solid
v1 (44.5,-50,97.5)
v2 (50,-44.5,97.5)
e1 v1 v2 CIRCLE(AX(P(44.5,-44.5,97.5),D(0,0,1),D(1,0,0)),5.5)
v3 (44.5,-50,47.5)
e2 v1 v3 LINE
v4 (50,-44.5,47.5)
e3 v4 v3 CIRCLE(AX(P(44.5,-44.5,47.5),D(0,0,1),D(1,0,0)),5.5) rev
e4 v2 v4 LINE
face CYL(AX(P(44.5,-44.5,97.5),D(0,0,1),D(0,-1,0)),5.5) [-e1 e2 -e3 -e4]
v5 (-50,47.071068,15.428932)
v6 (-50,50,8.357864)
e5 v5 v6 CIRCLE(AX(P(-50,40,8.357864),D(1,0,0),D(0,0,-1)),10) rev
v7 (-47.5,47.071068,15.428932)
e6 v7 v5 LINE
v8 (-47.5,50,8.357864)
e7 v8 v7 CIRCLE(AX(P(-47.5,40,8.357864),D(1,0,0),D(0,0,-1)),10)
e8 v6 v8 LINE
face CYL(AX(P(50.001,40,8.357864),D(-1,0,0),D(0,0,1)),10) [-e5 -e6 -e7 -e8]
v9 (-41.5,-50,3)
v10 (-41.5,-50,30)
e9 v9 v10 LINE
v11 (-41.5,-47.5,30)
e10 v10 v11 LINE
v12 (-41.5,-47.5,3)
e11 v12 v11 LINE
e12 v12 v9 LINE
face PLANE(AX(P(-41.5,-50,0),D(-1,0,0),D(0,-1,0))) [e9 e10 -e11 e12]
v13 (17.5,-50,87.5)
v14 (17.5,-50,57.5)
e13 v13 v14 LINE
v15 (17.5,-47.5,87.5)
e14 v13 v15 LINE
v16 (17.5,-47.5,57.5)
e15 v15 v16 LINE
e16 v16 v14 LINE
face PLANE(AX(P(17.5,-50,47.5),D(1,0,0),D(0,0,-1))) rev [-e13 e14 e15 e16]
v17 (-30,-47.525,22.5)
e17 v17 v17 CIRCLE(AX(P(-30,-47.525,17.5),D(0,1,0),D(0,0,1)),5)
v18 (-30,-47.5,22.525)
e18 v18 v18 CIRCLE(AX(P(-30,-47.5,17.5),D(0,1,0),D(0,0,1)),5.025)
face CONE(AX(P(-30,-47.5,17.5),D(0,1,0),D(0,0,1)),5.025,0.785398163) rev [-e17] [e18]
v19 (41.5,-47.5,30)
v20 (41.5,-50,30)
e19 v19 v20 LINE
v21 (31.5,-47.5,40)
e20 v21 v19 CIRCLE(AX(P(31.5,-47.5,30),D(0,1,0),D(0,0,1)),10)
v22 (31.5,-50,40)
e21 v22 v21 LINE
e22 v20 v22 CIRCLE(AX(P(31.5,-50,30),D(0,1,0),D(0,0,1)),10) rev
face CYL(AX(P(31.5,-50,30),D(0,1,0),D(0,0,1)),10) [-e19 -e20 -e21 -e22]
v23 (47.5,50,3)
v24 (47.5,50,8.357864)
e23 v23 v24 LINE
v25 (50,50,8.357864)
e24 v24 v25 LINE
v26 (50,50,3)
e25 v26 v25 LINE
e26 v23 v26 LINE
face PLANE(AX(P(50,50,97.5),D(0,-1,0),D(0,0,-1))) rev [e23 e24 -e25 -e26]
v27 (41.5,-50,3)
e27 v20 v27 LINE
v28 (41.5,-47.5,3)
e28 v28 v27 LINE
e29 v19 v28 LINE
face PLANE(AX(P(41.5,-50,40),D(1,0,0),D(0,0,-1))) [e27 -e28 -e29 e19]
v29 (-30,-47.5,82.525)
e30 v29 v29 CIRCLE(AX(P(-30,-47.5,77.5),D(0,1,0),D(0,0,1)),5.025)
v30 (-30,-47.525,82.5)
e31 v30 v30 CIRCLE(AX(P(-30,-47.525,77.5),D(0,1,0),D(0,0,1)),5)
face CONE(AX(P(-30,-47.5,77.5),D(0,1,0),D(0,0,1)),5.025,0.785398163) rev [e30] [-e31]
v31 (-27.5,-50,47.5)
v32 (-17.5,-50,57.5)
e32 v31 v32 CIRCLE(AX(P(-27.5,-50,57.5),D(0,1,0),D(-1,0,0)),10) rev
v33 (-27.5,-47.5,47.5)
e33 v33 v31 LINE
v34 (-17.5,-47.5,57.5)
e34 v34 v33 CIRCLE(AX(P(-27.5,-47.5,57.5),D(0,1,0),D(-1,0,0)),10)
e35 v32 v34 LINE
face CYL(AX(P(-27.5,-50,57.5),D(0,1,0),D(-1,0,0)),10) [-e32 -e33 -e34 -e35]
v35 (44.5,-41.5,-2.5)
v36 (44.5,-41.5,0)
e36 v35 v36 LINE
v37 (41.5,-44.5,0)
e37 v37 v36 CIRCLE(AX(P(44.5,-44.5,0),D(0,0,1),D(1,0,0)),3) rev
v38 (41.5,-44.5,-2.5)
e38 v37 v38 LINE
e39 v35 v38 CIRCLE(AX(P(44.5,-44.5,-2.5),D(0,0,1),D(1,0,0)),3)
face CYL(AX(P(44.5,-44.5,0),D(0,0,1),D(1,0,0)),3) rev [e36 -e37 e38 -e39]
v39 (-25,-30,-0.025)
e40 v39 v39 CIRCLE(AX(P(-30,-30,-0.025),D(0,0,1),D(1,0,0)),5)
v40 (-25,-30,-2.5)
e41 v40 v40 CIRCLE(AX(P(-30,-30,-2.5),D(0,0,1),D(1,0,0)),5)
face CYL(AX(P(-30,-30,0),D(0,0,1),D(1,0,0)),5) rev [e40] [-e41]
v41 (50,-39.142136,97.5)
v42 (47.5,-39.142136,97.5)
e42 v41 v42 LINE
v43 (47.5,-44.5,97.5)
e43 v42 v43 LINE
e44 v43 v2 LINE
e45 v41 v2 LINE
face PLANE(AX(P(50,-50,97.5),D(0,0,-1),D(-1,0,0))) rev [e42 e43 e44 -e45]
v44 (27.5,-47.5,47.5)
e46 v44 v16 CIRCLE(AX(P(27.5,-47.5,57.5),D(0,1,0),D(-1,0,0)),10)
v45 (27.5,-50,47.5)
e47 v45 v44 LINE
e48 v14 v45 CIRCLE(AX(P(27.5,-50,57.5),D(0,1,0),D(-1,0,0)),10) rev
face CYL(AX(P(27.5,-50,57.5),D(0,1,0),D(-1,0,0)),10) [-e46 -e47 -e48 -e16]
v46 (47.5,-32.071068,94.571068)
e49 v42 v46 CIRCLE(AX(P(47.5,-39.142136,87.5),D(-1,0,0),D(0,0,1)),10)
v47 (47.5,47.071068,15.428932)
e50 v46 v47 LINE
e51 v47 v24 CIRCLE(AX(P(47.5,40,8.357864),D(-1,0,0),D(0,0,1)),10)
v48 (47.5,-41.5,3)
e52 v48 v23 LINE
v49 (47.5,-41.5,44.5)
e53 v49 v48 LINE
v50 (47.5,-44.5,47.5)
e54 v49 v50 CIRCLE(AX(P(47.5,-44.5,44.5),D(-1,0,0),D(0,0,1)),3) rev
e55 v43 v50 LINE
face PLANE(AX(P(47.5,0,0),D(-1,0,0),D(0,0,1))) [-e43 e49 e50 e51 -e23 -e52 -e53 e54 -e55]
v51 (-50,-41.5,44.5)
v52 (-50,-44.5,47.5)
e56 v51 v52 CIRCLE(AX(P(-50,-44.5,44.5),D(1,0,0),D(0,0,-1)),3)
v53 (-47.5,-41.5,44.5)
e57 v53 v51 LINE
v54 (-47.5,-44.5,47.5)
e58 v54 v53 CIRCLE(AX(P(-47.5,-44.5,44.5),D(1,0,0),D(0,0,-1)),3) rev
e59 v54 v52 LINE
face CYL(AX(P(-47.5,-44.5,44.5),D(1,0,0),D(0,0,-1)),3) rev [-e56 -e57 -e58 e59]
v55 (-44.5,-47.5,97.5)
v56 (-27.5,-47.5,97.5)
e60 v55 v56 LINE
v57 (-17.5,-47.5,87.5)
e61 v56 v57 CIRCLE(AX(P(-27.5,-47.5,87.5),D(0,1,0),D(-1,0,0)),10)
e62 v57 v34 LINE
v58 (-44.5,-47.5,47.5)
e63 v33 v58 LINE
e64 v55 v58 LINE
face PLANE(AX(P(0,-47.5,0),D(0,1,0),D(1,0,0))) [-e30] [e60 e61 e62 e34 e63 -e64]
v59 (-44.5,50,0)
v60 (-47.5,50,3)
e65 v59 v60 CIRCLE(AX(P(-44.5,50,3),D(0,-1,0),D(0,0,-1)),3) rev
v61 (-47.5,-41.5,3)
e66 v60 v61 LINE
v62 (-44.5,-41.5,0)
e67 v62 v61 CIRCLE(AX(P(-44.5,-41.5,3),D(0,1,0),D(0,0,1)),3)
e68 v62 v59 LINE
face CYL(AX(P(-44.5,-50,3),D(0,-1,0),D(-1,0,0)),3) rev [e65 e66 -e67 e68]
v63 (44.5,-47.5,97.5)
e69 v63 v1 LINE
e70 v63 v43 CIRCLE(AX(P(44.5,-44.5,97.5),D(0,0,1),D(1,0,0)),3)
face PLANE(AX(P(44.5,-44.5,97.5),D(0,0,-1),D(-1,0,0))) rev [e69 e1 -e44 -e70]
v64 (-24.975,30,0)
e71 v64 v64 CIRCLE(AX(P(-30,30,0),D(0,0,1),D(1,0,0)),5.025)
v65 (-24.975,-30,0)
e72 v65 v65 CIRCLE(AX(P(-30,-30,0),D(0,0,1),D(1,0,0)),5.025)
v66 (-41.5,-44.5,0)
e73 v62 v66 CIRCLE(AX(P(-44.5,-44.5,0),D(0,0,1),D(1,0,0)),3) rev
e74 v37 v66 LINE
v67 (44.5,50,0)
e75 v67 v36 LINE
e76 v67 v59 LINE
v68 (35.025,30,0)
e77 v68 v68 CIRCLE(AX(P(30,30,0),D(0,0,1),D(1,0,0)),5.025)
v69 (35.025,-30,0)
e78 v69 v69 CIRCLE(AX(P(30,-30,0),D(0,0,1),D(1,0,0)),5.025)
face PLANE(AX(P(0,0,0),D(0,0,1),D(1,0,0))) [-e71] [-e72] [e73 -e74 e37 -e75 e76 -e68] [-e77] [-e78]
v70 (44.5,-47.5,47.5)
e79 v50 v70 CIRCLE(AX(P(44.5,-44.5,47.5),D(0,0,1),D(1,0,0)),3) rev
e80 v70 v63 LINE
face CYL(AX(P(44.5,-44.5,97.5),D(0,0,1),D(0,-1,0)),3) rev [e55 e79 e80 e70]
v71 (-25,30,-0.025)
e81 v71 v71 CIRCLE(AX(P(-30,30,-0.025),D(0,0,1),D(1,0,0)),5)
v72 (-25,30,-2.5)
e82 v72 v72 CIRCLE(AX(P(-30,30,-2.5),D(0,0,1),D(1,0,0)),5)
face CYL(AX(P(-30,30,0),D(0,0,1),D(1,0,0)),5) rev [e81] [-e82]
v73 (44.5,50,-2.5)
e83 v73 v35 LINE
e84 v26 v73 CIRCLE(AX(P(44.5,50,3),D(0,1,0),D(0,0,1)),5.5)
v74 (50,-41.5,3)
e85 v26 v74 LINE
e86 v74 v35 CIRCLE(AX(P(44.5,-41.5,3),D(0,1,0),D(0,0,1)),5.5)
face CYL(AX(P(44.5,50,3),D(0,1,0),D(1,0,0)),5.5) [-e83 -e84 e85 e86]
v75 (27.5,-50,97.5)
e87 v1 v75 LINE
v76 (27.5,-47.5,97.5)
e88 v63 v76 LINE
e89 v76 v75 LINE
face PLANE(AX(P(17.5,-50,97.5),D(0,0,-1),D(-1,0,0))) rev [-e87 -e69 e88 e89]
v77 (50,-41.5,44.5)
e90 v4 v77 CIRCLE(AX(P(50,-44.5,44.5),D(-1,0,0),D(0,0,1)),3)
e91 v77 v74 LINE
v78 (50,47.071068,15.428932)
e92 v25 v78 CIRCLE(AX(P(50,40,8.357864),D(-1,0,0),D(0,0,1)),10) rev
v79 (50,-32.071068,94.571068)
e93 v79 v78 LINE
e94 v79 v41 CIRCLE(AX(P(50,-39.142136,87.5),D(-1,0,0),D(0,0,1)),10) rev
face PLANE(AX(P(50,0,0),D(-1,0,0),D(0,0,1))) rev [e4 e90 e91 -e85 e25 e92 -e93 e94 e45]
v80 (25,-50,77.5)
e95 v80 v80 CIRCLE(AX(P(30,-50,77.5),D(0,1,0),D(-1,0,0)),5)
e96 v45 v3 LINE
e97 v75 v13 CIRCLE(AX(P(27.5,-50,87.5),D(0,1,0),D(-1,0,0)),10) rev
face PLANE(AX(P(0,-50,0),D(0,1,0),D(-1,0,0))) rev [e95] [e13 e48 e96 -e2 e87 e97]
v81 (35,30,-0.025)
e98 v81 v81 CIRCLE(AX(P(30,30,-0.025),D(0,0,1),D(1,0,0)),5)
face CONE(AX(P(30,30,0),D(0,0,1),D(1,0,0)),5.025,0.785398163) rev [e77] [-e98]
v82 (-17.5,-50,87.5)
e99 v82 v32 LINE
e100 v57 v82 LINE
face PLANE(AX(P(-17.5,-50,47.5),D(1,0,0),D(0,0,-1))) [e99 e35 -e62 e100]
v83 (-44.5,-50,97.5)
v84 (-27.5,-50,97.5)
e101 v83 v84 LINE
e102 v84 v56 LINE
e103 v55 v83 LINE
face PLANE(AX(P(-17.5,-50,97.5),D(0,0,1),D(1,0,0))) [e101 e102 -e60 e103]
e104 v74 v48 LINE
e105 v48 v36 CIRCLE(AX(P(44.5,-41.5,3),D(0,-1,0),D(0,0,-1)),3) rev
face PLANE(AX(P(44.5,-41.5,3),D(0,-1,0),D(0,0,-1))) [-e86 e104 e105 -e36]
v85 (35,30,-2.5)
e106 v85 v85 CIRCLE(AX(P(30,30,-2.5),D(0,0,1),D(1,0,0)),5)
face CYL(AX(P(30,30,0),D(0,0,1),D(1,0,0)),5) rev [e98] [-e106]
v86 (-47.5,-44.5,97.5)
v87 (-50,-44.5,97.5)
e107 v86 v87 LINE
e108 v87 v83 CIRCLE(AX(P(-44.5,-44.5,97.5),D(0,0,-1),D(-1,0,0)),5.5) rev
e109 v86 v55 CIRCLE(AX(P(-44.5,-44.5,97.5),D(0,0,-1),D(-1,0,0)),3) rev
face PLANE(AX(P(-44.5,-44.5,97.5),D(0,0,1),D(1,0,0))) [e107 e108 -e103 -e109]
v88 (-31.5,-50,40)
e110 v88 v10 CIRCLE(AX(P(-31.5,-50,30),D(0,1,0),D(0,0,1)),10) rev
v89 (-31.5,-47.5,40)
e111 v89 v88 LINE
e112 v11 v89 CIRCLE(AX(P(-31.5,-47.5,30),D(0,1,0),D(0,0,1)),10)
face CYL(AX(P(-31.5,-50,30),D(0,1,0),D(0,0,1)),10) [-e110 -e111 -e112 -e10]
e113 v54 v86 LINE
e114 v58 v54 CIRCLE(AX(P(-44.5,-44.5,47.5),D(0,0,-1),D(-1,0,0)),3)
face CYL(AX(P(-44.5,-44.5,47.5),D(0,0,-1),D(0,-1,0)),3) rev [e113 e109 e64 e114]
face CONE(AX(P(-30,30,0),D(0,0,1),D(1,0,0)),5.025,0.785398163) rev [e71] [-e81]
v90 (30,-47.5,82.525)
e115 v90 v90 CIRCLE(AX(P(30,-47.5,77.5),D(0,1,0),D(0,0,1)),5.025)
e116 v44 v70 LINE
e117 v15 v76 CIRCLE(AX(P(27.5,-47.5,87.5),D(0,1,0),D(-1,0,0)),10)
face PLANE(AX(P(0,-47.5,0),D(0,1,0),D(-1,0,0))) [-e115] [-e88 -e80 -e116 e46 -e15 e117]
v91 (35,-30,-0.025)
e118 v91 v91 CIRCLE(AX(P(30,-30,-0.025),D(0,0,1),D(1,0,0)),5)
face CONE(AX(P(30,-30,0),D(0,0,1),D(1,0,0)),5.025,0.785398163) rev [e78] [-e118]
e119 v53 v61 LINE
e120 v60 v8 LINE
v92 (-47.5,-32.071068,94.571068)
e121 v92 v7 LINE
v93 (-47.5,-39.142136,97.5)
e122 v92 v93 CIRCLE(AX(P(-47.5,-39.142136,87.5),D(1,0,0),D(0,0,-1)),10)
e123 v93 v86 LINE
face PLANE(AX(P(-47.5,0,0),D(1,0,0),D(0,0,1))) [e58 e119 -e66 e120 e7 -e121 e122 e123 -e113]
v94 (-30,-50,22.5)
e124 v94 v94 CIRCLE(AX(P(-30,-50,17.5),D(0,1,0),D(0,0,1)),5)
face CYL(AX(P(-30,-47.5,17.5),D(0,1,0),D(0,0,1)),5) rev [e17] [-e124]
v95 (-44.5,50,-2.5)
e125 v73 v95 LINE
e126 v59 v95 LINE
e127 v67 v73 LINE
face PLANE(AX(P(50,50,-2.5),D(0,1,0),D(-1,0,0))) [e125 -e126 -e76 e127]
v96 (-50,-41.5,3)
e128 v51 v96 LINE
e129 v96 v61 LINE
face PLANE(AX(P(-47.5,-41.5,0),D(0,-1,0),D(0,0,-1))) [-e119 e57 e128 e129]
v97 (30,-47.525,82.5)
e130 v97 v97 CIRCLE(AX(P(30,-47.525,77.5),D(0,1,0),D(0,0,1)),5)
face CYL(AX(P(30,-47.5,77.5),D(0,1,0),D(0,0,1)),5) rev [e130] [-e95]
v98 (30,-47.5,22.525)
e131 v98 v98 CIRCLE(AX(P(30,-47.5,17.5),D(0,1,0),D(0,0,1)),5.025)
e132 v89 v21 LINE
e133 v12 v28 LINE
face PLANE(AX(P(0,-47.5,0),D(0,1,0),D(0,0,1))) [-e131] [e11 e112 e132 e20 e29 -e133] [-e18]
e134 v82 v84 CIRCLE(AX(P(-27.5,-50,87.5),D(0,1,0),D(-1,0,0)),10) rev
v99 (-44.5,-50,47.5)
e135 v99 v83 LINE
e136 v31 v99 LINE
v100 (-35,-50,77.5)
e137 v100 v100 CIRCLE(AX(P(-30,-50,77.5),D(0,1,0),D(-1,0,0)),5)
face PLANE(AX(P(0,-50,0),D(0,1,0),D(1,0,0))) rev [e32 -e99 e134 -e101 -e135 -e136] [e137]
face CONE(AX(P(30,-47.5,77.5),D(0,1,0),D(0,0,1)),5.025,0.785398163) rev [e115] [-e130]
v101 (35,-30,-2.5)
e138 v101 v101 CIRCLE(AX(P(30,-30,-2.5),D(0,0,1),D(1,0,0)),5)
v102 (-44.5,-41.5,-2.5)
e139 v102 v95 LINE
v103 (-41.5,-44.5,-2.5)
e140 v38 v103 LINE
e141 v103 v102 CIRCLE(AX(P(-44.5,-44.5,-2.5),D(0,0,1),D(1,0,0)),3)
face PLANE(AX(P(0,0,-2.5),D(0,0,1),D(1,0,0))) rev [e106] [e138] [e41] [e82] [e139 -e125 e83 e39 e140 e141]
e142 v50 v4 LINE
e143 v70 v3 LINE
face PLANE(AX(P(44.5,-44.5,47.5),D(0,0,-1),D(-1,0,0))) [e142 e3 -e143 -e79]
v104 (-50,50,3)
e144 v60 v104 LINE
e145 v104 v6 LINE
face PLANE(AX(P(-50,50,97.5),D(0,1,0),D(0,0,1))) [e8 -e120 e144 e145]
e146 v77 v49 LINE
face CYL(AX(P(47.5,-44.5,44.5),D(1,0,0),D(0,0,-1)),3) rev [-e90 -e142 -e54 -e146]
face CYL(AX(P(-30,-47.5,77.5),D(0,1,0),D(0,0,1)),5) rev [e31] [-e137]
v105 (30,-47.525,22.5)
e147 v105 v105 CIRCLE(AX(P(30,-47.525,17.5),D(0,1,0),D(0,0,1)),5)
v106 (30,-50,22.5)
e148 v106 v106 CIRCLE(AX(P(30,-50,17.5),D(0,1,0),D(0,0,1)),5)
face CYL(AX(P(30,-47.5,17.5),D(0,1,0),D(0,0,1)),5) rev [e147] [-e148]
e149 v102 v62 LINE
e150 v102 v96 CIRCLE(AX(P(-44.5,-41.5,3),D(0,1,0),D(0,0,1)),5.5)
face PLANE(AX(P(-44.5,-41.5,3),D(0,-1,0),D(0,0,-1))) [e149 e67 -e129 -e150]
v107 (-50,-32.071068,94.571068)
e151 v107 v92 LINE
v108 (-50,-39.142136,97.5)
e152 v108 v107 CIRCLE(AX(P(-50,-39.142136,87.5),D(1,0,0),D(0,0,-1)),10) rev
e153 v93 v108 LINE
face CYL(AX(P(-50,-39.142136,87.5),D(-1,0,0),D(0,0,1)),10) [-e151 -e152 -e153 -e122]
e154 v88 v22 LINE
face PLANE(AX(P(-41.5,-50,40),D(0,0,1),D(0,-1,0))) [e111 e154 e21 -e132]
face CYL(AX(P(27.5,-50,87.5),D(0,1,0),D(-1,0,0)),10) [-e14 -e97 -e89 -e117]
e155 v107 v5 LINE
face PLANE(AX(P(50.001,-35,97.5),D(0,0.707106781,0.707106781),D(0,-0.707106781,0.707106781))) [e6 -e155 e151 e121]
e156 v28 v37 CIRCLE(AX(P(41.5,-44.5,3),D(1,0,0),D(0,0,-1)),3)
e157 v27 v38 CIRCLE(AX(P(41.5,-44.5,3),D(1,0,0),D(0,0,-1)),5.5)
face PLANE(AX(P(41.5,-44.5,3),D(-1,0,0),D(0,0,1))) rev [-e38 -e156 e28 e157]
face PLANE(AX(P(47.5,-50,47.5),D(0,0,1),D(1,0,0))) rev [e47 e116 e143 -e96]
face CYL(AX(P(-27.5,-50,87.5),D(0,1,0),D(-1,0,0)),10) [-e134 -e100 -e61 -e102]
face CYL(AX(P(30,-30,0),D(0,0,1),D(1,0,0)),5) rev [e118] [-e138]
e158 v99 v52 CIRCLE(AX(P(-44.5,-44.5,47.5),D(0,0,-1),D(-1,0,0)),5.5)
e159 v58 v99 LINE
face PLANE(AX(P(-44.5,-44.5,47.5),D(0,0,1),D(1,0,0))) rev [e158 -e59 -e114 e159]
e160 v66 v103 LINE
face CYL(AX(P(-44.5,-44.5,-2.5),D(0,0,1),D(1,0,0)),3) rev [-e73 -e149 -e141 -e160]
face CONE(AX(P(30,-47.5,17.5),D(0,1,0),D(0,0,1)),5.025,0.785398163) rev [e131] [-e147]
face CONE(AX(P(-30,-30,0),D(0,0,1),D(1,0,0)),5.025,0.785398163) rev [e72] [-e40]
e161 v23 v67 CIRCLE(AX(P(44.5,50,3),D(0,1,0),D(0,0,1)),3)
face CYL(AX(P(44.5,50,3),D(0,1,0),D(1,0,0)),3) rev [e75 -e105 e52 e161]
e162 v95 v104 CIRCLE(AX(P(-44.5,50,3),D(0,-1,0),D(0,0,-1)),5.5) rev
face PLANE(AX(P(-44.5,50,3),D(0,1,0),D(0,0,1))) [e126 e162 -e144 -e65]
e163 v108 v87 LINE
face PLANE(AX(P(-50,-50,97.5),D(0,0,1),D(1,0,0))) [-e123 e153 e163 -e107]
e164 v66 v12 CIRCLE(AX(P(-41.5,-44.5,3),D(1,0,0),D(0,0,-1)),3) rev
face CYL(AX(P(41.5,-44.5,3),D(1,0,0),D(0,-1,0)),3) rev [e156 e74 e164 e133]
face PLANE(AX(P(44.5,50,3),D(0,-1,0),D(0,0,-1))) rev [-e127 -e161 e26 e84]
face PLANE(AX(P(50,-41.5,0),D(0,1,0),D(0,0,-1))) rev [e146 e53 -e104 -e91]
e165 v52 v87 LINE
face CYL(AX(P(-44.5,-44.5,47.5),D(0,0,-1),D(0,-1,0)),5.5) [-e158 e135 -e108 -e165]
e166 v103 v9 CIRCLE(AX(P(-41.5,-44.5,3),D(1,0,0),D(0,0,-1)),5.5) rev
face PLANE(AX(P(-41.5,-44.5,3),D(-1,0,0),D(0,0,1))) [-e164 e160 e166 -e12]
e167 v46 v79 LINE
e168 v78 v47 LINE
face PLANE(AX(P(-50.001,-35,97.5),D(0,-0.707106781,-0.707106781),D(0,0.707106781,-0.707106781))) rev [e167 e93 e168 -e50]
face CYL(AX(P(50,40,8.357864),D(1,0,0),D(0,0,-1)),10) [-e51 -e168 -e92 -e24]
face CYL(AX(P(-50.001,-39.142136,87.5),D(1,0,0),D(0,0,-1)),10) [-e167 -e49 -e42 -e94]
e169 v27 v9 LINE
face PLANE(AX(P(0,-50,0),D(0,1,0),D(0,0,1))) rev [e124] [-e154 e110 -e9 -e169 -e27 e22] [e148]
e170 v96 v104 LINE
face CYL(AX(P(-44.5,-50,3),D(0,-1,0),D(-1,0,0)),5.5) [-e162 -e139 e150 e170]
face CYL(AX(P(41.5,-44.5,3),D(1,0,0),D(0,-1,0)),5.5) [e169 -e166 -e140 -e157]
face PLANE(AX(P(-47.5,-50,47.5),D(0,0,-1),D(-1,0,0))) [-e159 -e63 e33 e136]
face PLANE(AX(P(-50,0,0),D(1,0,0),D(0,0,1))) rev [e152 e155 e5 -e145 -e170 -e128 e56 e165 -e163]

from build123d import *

# Parameters (mm, degrees)
SKETCH1_W                       = 100
SKETCH1_H                       = 100
BASE_FLANGE1_DEPTH              = 2.5
EDGE_FLANGE1_STRIP_W            = 16
EDGE_FLANGE1_STRIP_H            = 2.5
EDGE_FLANGE1_STRIP_CUT_DEPTH    = 83
EDGE_FLANGE1_RELIEF_W           = 17.25
EDGE_FLANGE1_RELIEF_H           = 1.25
EDGE_FLANGE1_RELIEF_CUT_DEPTH   = 2.5
EDGE_FLANGE1_DEPTH              = 83
EDGE_FLANGE2_STRIP_W            = 16
EDGE_FLANGE2_STRIP_H            = 2.5
EDGE_FLANGE2_STRIP_CUT_DEPTH    = 100
EDGE_FLANGE2_DEPTH              = 100
EDGE_FLANGE3_STRIP_W            = 16
EDGE_FLANGE3_STRIP_H            = 2.5
EDGE_FLANGE3_STRIP_CUT_DEPTH    = 50
EDGE_FLANGE3_RELIEF_W           = 17.25
EDGE_FLANGE3_RELIEF_H           = 1.25
EDGE_FLANGE3_RELIEF_CUT_DEPTH   = 2.5
EDGE_FLANGE3_DEPTH              = 50
SKETCH17_W                      = 50
SKETCH17_H                      = 8.5
CUT_EXTRUDE1_DEPTH              = 8.5
CUT_EXTRUDE2_REACH              = 150.345
F_10_0MM_DOWEL_HOLE1_AT_2_COUNT = 2
F_10_0MM_DOWEL_HOLE1_AT_2_PITCH = 60
F_10_0MM_DOWEL_HOLE2_AT_2_COUNT = 2
F_10_0MM_DOWEL_HOLE2_AT_2_PITCH = 60
FILLET3_R                       = 3
FILLET4_R                       = 10


# Sheet-metal steps are written as plain solids
with BuildPart() as part:
    # Sketch1 → Base-Flange1 (new body)
    with BuildSketch(Plane.XY):
        Rectangle(SKETCH1_W, SKETCH1_H)
    extrude(amount=-BASE_FLANGE1_DEPTH)

    # Edge-Flange1 strip (across the edge) → Edge-Flange1 strip cut (cut)
    with BuildSketch(Plane(origin=(-41.5, -50, 0), x_dir=(0, 1, 0), z_dir=(1, 0, 0))):
        with Locations((-2.5, -1.25)):
            Rectangle(EDGE_FLANGE1_STRIP_W, EDGE_FLANGE1_STRIP_H)
    extrude(amount=EDGE_FLANGE1_STRIP_CUT_DEPTH, mode=Mode.SUBTRACT)

    # Edge-Flange1 relief (on the sheet) → Edge-Flange1 relief cut (cut)
    with BuildSketch(Plane(origin=(-41.5, -44.5, 0), x_dir=(0, 1, 0), z_dir=(0, 0, 1))):
        with Locations((-7.375, 0.625)):
            Rectangle(EDGE_FLANGE1_RELIEF_W, EDGE_FLANGE1_RELIEF_H)
        with Locations((-7.375, -83.625)):
            Rectangle(EDGE_FLANGE1_RELIEF_W, EDGE_FLANGE1_RELIEF_H)
    extrude(amount=-EDGE_FLANGE1_RELIEF_CUT_DEPTH, mode=Mode.SUBTRACT)

    # Edge-Flange1 section (across the edge) → Edge-Flange1 (add)
    with BuildSketch(Plane(origin=(-41.5, -50, 0), x_dir=(0, 1, 0), z_dir=(1, 0, 0))):
        with BuildLine():
            Line((0, 3), (0, 40))
            Line((0, 40), (2.5, 40))
            Line((2.5, 40), (2.5, 3))
            ThreePointArc((2.5, 3), (3.378679656, 0.878679656), (5.5, 0))
            Line((5.5, 0), (5.5, -2.5))
            ThreePointArc((5.5, -2.5), (1.610912703, -0.889087297), (0, 3))
        make_face()
    extrude(amount=EDGE_FLANGE1_DEPTH)

    # Edge-Flange2 strip (across the edge) → Edge-Flange2 strip cut (cut)
    with BuildSketch(Plane(origin=(50, -50, 0), x_dir=(-1, 0, 0), z_dir=(0, 1, 0))):
        with Locations((-2.5, -1.25)):
            Rectangle(EDGE_FLANGE2_STRIP_W, EDGE_FLANGE2_STRIP_H)
    edge_flange2_strip_cut = extrude(amount=EDGE_FLANGE2_STRIP_CUT_DEPTH, mode=Mode.SUBTRACT)

    # Edge-Flange2 section (across the edge) → Edge-Flange2 (add)
    with BuildSketch(Plane(origin=(50, -50, 0), x_dir=(-1, 0, 0), z_dir=(0, 1, 0))):
        with BuildLine():
            Line((0, 3), (0, 97.5))
            Line((0, 97.5), (2.5, 97.5))
            Line((2.5, 97.5), (2.5, 3))
            ThreePointArc((2.5, 3), (3.378679656, 0.878679656), (5.5, 0))
            Line((5.5, 0), (5.5, -2.5))
            ThreePointArc((5.5, -2.5), (1.610912703, -0.889087297), (0, 3))
        make_face()
    edge_flange2 = extrude(amount=EDGE_FLANGE2_DEPTH)

    # Edge-Flange3 strip (across the edge) → Edge-Flange3 strip cut (cut)
    with BuildSketch(Plane(origin=(47.5, -50, 47.5), x_dir=(0, 1, 0), z_dir=(0, 0, 1))):
        with Locations((-2.5, -1.25)):
            Rectangle(EDGE_FLANGE3_STRIP_W, EDGE_FLANGE3_STRIP_H)
    edge_flange3_strip_cut = extrude(amount=EDGE_FLANGE3_STRIP_CUT_DEPTH, mode=Mode.SUBTRACT)

    # Edge-Flange3 relief (on the sheet) → Edge-Flange3 relief cut (cut)
    with BuildSketch(Plane(origin=(47.5, -44.5, 47.5), x_dir=(0, 1, 0), z_dir=(-1, 0, 0))):
        with Locations((-7.375, 0.625)):
            Rectangle(EDGE_FLANGE3_RELIEF_W, EDGE_FLANGE3_RELIEF_H)
    edge_flange3_relief_cut = extrude(amount=-EDGE_FLANGE3_RELIEF_CUT_DEPTH, mode=Mode.SUBTRACT)

    # Edge-Flange3 section (across the edge) → Edge-Flange3 (add)
    with BuildSketch(Plane(origin=(47.5, -50, 47.5), x_dir=(0, 1, 0), z_dir=(0, 0, 1))):
        with BuildLine():
            Line((0, 3), (0, 30))
            Line((0, 30), (2.5, 30))
            Line((2.5, 30), (2.5, 3))
            ThreePointArc((2.5, 3), (3.378679656, 0.878679656), (5.5, 0))
            Line((5.5, 0), (5.5, -2.5))
            ThreePointArc((5.5, -2.5), (1.610912703, -0.889087297), (0, 3))
        make_face()
    edge_flange3 = extrude(amount=EDGE_FLANGE3_DEPTH)

    # Sketch17 → Cut-Extrude1 (cut)
    with BuildSketch(Plane(origin=(50, 0, 0), x_dir=(0, 0, -1), z_dir=(1, 0, 0))):
        with Locations((-22.5, -45.75)):
            Rectangle(SKETCH17_W, SKETCH17_H)
    cut_extrude1 = extrude(amount=-CUT_EXTRUDE1_DEPTH, mode=Mode.SUBTRACT)

    # Sketch18 → Cut-Extrude2 (cut, up to next)
    with BuildSketch(Plane(origin=(50, 0, 0), x_dir=(0, 0, -1), z_dir=(1, 0, 0)), mode=Mode.PRIVATE) as cut_extrude2_sk1:
        Polygon((-97.5, 50), (-97.5, -35), (-12.5, 50), align=None)
    cut_extrude2_tool1 = extrude(cut_extrude2_sk1.sketch, amount=-CUT_EXTRUDE2_REACH, mode=Mode.PRIVATE) & part.part
    cut_extrude2 = cut_extrude2_tool1.solids().sort_by_distance((50, 21.666667, 69.166667))[0]
    add(cut_extrude2, mode=Mode.SUBTRACT)

    # Sketch20 → Ø10.0mm Dowel Hole1 (revolve, cut)
    with BuildSketch(Plane(origin=(30, 30, 0), x_dir=(0, -1, 0), z_dir=(1, 0, 0))):
        Polygon((0, 0), (0, 2.5), (5, 2.5), (5, 0.025), (5.025, 0), align=None)
    f_10_0mm_dowel_hole1 = revolve(axis=Axis((30, 30, 6.35), (0, 0, -1)), mode=Mode.SUBTRACT)

    # Ø10.0mm Dowel Hole1 at 2: Ø10.0mm Dowel Hole1 ×2
    with Locations(*[(0, -i * F_10_0MM_DOWEL_HOLE1_AT_2_PITCH, 0) for i in range(1, F_10_0MM_DOWEL_HOLE1_AT_2_COUNT)]):
        add(f_10_0mm_dowel_hole1, mode=Mode.SUBTRACT)

    # Sketch22 → Ø10.0mm Dowel Hole2 (revolve, cut)
    with BuildSketch(Plane(origin=(30, -47.5, 17.5), x_dir=(0, 0, 1), z_dir=(1, 0, 0))):
        Polygon((0, 0), (0, 2.5), (5, 2.5), (5, 0.025), (5.025, 0), align=None)
    f_10_0mm_dowel_hole2 = revolve(axis=Axis((30, -41.15, 17.5), (0, -1, 0)), mode=Mode.SUBTRACT)

    # Ø10.0mm Dowel Hole2 at 2: Ø10.0mm Dowel Hole2 ×2
    with Locations(*[(0, 0, i * F_10_0MM_DOWEL_HOLE2_AT_2_PITCH) for i in range(1, F_10_0MM_DOWEL_HOLE2_AT_2_COUNT)]):
        add(f_10_0mm_dowel_hole2, mode=Mode.SUBTRACT)

    # Mirror3: Edge-Flange2 strip cut, Edge-Flange2, Edge-Flange3 strip cut, Edge-Flange3 relief cut, Edge-Flange3, Cut-Extrude1, Cut-Extrude2, Ø10.0mm Dowel Hole1, Ø10.0mm Dowel Hole2 across plane
    add(edge_flange2_strip_cut.mirror(Plane(origin=(0, 0, 0), x_dir=(0, 0, 1), z_dir=(1, 0, 0))), mode=Mode.SUBTRACT)
    add(edge_flange2.mirror(Plane(origin=(0, 0, 0), x_dir=(0, 0, 1), z_dir=(1, 0, 0))))
    add(edge_flange3_strip_cut.mirror(Plane(origin=(0, 0, 0), x_dir=(0, 0, 1), z_dir=(1, 0, 0))), mode=Mode.SUBTRACT)
    add(edge_flange3_relief_cut.mirror(Plane(origin=(0, 0, 0), x_dir=(0, 0, 1), z_dir=(1, 0, 0))), mode=Mode.SUBTRACT)
    add(edge_flange3.mirror(Plane(origin=(0, 0, 0), x_dir=(0, 0, 1), z_dir=(1, 0, 0))))
    add(cut_extrude1.mirror(Plane(origin=(0, 0, 0), x_dir=(0, 0, 1), z_dir=(1, 0, 0))), mode=Mode.SUBTRACT)
    add(cut_extrude2.mirror(Plane(origin=(0, 0, 0), x_dir=(0, 0, 1), z_dir=(1, 0, 0))), mode=Mode.SUBTRACT)
    add(f_10_0mm_dowel_hole1.mirror(Plane(origin=(0, 0, 0), x_dir=(0, 0, 1), z_dir=(1, 0, 0))), mode=Mode.SUBTRACT)
    add(f_10_0mm_dowel_hole2.mirror(Plane(origin=(0, 0, 0), x_dir=(0, 0, 1), z_dir=(1, 0, 0))), mode=Mode.SUBTRACT)

    # Mirror3 copy 1 sketch → Mirror3 copy 1 (revolve, cut)
    with BuildSketch(Plane(origin=(-30, -30, 0), x_dir=(0, -1, 0), z_dir=(-1, 0, 0))):
        Polygon((0, 0), (0, -2.5), (5, -2.5), (5, -0.025), (5.025, 0), align=None)
    revolve(axis=Axis((-30, -30, 6.35), (0, 0, 1)), mode=Mode.SUBTRACT)

    # Mirror3 copy 2 sketch → Mirror3 copy 2 (revolve, cut)
    with BuildSketch(Plane(origin=(-30, -47.5, 77.5), x_dir=(0, 0, 1), z_dir=(-1, 0, 0))):
        Polygon((0, 0), (0, -2.5), (5, -2.5), (5, -0.025), (5.025, 0), align=None)
    revolve(axis=Axis((-30, -41.15, 77.5), (0, 1, 0)), mode=Mode.SUBTRACT)

    # Fillet3
    fillet3_edges = [part.edges().sort_by_distance(p)[0] for p in [
        (48.75, -41.5, 47.5),
        (41.5, -41.5, -1.25),
        (-48.75, -41.5, 47.5),
        (-41.5, -41.5, -1.25),
    ]]
    fillet(fillet3_edges, radius=FILLET3_R)

    # Fillet4
    fillet4_edges = [part.edges().sort_by_distance(p)[0] for p in [
        (17.5, -48.75, 47.5),
        (17.5, -48.75, 97.5),
        (48.75, 50, 12.5),
        (48.75, -35, 97.5),
        (-17.5, -48.75, 97.5),
        (-17.5, -48.75, 47.5),
        (-48.75, -35, 97.5),
        (-48.75, 50, 12.5),
        (-41.5, -48.75, 40),
        (41.5, -48.75, 40),
    ]]
    fillet(fillet4_edges, radius=FILLET4_R)


solid = part.part
